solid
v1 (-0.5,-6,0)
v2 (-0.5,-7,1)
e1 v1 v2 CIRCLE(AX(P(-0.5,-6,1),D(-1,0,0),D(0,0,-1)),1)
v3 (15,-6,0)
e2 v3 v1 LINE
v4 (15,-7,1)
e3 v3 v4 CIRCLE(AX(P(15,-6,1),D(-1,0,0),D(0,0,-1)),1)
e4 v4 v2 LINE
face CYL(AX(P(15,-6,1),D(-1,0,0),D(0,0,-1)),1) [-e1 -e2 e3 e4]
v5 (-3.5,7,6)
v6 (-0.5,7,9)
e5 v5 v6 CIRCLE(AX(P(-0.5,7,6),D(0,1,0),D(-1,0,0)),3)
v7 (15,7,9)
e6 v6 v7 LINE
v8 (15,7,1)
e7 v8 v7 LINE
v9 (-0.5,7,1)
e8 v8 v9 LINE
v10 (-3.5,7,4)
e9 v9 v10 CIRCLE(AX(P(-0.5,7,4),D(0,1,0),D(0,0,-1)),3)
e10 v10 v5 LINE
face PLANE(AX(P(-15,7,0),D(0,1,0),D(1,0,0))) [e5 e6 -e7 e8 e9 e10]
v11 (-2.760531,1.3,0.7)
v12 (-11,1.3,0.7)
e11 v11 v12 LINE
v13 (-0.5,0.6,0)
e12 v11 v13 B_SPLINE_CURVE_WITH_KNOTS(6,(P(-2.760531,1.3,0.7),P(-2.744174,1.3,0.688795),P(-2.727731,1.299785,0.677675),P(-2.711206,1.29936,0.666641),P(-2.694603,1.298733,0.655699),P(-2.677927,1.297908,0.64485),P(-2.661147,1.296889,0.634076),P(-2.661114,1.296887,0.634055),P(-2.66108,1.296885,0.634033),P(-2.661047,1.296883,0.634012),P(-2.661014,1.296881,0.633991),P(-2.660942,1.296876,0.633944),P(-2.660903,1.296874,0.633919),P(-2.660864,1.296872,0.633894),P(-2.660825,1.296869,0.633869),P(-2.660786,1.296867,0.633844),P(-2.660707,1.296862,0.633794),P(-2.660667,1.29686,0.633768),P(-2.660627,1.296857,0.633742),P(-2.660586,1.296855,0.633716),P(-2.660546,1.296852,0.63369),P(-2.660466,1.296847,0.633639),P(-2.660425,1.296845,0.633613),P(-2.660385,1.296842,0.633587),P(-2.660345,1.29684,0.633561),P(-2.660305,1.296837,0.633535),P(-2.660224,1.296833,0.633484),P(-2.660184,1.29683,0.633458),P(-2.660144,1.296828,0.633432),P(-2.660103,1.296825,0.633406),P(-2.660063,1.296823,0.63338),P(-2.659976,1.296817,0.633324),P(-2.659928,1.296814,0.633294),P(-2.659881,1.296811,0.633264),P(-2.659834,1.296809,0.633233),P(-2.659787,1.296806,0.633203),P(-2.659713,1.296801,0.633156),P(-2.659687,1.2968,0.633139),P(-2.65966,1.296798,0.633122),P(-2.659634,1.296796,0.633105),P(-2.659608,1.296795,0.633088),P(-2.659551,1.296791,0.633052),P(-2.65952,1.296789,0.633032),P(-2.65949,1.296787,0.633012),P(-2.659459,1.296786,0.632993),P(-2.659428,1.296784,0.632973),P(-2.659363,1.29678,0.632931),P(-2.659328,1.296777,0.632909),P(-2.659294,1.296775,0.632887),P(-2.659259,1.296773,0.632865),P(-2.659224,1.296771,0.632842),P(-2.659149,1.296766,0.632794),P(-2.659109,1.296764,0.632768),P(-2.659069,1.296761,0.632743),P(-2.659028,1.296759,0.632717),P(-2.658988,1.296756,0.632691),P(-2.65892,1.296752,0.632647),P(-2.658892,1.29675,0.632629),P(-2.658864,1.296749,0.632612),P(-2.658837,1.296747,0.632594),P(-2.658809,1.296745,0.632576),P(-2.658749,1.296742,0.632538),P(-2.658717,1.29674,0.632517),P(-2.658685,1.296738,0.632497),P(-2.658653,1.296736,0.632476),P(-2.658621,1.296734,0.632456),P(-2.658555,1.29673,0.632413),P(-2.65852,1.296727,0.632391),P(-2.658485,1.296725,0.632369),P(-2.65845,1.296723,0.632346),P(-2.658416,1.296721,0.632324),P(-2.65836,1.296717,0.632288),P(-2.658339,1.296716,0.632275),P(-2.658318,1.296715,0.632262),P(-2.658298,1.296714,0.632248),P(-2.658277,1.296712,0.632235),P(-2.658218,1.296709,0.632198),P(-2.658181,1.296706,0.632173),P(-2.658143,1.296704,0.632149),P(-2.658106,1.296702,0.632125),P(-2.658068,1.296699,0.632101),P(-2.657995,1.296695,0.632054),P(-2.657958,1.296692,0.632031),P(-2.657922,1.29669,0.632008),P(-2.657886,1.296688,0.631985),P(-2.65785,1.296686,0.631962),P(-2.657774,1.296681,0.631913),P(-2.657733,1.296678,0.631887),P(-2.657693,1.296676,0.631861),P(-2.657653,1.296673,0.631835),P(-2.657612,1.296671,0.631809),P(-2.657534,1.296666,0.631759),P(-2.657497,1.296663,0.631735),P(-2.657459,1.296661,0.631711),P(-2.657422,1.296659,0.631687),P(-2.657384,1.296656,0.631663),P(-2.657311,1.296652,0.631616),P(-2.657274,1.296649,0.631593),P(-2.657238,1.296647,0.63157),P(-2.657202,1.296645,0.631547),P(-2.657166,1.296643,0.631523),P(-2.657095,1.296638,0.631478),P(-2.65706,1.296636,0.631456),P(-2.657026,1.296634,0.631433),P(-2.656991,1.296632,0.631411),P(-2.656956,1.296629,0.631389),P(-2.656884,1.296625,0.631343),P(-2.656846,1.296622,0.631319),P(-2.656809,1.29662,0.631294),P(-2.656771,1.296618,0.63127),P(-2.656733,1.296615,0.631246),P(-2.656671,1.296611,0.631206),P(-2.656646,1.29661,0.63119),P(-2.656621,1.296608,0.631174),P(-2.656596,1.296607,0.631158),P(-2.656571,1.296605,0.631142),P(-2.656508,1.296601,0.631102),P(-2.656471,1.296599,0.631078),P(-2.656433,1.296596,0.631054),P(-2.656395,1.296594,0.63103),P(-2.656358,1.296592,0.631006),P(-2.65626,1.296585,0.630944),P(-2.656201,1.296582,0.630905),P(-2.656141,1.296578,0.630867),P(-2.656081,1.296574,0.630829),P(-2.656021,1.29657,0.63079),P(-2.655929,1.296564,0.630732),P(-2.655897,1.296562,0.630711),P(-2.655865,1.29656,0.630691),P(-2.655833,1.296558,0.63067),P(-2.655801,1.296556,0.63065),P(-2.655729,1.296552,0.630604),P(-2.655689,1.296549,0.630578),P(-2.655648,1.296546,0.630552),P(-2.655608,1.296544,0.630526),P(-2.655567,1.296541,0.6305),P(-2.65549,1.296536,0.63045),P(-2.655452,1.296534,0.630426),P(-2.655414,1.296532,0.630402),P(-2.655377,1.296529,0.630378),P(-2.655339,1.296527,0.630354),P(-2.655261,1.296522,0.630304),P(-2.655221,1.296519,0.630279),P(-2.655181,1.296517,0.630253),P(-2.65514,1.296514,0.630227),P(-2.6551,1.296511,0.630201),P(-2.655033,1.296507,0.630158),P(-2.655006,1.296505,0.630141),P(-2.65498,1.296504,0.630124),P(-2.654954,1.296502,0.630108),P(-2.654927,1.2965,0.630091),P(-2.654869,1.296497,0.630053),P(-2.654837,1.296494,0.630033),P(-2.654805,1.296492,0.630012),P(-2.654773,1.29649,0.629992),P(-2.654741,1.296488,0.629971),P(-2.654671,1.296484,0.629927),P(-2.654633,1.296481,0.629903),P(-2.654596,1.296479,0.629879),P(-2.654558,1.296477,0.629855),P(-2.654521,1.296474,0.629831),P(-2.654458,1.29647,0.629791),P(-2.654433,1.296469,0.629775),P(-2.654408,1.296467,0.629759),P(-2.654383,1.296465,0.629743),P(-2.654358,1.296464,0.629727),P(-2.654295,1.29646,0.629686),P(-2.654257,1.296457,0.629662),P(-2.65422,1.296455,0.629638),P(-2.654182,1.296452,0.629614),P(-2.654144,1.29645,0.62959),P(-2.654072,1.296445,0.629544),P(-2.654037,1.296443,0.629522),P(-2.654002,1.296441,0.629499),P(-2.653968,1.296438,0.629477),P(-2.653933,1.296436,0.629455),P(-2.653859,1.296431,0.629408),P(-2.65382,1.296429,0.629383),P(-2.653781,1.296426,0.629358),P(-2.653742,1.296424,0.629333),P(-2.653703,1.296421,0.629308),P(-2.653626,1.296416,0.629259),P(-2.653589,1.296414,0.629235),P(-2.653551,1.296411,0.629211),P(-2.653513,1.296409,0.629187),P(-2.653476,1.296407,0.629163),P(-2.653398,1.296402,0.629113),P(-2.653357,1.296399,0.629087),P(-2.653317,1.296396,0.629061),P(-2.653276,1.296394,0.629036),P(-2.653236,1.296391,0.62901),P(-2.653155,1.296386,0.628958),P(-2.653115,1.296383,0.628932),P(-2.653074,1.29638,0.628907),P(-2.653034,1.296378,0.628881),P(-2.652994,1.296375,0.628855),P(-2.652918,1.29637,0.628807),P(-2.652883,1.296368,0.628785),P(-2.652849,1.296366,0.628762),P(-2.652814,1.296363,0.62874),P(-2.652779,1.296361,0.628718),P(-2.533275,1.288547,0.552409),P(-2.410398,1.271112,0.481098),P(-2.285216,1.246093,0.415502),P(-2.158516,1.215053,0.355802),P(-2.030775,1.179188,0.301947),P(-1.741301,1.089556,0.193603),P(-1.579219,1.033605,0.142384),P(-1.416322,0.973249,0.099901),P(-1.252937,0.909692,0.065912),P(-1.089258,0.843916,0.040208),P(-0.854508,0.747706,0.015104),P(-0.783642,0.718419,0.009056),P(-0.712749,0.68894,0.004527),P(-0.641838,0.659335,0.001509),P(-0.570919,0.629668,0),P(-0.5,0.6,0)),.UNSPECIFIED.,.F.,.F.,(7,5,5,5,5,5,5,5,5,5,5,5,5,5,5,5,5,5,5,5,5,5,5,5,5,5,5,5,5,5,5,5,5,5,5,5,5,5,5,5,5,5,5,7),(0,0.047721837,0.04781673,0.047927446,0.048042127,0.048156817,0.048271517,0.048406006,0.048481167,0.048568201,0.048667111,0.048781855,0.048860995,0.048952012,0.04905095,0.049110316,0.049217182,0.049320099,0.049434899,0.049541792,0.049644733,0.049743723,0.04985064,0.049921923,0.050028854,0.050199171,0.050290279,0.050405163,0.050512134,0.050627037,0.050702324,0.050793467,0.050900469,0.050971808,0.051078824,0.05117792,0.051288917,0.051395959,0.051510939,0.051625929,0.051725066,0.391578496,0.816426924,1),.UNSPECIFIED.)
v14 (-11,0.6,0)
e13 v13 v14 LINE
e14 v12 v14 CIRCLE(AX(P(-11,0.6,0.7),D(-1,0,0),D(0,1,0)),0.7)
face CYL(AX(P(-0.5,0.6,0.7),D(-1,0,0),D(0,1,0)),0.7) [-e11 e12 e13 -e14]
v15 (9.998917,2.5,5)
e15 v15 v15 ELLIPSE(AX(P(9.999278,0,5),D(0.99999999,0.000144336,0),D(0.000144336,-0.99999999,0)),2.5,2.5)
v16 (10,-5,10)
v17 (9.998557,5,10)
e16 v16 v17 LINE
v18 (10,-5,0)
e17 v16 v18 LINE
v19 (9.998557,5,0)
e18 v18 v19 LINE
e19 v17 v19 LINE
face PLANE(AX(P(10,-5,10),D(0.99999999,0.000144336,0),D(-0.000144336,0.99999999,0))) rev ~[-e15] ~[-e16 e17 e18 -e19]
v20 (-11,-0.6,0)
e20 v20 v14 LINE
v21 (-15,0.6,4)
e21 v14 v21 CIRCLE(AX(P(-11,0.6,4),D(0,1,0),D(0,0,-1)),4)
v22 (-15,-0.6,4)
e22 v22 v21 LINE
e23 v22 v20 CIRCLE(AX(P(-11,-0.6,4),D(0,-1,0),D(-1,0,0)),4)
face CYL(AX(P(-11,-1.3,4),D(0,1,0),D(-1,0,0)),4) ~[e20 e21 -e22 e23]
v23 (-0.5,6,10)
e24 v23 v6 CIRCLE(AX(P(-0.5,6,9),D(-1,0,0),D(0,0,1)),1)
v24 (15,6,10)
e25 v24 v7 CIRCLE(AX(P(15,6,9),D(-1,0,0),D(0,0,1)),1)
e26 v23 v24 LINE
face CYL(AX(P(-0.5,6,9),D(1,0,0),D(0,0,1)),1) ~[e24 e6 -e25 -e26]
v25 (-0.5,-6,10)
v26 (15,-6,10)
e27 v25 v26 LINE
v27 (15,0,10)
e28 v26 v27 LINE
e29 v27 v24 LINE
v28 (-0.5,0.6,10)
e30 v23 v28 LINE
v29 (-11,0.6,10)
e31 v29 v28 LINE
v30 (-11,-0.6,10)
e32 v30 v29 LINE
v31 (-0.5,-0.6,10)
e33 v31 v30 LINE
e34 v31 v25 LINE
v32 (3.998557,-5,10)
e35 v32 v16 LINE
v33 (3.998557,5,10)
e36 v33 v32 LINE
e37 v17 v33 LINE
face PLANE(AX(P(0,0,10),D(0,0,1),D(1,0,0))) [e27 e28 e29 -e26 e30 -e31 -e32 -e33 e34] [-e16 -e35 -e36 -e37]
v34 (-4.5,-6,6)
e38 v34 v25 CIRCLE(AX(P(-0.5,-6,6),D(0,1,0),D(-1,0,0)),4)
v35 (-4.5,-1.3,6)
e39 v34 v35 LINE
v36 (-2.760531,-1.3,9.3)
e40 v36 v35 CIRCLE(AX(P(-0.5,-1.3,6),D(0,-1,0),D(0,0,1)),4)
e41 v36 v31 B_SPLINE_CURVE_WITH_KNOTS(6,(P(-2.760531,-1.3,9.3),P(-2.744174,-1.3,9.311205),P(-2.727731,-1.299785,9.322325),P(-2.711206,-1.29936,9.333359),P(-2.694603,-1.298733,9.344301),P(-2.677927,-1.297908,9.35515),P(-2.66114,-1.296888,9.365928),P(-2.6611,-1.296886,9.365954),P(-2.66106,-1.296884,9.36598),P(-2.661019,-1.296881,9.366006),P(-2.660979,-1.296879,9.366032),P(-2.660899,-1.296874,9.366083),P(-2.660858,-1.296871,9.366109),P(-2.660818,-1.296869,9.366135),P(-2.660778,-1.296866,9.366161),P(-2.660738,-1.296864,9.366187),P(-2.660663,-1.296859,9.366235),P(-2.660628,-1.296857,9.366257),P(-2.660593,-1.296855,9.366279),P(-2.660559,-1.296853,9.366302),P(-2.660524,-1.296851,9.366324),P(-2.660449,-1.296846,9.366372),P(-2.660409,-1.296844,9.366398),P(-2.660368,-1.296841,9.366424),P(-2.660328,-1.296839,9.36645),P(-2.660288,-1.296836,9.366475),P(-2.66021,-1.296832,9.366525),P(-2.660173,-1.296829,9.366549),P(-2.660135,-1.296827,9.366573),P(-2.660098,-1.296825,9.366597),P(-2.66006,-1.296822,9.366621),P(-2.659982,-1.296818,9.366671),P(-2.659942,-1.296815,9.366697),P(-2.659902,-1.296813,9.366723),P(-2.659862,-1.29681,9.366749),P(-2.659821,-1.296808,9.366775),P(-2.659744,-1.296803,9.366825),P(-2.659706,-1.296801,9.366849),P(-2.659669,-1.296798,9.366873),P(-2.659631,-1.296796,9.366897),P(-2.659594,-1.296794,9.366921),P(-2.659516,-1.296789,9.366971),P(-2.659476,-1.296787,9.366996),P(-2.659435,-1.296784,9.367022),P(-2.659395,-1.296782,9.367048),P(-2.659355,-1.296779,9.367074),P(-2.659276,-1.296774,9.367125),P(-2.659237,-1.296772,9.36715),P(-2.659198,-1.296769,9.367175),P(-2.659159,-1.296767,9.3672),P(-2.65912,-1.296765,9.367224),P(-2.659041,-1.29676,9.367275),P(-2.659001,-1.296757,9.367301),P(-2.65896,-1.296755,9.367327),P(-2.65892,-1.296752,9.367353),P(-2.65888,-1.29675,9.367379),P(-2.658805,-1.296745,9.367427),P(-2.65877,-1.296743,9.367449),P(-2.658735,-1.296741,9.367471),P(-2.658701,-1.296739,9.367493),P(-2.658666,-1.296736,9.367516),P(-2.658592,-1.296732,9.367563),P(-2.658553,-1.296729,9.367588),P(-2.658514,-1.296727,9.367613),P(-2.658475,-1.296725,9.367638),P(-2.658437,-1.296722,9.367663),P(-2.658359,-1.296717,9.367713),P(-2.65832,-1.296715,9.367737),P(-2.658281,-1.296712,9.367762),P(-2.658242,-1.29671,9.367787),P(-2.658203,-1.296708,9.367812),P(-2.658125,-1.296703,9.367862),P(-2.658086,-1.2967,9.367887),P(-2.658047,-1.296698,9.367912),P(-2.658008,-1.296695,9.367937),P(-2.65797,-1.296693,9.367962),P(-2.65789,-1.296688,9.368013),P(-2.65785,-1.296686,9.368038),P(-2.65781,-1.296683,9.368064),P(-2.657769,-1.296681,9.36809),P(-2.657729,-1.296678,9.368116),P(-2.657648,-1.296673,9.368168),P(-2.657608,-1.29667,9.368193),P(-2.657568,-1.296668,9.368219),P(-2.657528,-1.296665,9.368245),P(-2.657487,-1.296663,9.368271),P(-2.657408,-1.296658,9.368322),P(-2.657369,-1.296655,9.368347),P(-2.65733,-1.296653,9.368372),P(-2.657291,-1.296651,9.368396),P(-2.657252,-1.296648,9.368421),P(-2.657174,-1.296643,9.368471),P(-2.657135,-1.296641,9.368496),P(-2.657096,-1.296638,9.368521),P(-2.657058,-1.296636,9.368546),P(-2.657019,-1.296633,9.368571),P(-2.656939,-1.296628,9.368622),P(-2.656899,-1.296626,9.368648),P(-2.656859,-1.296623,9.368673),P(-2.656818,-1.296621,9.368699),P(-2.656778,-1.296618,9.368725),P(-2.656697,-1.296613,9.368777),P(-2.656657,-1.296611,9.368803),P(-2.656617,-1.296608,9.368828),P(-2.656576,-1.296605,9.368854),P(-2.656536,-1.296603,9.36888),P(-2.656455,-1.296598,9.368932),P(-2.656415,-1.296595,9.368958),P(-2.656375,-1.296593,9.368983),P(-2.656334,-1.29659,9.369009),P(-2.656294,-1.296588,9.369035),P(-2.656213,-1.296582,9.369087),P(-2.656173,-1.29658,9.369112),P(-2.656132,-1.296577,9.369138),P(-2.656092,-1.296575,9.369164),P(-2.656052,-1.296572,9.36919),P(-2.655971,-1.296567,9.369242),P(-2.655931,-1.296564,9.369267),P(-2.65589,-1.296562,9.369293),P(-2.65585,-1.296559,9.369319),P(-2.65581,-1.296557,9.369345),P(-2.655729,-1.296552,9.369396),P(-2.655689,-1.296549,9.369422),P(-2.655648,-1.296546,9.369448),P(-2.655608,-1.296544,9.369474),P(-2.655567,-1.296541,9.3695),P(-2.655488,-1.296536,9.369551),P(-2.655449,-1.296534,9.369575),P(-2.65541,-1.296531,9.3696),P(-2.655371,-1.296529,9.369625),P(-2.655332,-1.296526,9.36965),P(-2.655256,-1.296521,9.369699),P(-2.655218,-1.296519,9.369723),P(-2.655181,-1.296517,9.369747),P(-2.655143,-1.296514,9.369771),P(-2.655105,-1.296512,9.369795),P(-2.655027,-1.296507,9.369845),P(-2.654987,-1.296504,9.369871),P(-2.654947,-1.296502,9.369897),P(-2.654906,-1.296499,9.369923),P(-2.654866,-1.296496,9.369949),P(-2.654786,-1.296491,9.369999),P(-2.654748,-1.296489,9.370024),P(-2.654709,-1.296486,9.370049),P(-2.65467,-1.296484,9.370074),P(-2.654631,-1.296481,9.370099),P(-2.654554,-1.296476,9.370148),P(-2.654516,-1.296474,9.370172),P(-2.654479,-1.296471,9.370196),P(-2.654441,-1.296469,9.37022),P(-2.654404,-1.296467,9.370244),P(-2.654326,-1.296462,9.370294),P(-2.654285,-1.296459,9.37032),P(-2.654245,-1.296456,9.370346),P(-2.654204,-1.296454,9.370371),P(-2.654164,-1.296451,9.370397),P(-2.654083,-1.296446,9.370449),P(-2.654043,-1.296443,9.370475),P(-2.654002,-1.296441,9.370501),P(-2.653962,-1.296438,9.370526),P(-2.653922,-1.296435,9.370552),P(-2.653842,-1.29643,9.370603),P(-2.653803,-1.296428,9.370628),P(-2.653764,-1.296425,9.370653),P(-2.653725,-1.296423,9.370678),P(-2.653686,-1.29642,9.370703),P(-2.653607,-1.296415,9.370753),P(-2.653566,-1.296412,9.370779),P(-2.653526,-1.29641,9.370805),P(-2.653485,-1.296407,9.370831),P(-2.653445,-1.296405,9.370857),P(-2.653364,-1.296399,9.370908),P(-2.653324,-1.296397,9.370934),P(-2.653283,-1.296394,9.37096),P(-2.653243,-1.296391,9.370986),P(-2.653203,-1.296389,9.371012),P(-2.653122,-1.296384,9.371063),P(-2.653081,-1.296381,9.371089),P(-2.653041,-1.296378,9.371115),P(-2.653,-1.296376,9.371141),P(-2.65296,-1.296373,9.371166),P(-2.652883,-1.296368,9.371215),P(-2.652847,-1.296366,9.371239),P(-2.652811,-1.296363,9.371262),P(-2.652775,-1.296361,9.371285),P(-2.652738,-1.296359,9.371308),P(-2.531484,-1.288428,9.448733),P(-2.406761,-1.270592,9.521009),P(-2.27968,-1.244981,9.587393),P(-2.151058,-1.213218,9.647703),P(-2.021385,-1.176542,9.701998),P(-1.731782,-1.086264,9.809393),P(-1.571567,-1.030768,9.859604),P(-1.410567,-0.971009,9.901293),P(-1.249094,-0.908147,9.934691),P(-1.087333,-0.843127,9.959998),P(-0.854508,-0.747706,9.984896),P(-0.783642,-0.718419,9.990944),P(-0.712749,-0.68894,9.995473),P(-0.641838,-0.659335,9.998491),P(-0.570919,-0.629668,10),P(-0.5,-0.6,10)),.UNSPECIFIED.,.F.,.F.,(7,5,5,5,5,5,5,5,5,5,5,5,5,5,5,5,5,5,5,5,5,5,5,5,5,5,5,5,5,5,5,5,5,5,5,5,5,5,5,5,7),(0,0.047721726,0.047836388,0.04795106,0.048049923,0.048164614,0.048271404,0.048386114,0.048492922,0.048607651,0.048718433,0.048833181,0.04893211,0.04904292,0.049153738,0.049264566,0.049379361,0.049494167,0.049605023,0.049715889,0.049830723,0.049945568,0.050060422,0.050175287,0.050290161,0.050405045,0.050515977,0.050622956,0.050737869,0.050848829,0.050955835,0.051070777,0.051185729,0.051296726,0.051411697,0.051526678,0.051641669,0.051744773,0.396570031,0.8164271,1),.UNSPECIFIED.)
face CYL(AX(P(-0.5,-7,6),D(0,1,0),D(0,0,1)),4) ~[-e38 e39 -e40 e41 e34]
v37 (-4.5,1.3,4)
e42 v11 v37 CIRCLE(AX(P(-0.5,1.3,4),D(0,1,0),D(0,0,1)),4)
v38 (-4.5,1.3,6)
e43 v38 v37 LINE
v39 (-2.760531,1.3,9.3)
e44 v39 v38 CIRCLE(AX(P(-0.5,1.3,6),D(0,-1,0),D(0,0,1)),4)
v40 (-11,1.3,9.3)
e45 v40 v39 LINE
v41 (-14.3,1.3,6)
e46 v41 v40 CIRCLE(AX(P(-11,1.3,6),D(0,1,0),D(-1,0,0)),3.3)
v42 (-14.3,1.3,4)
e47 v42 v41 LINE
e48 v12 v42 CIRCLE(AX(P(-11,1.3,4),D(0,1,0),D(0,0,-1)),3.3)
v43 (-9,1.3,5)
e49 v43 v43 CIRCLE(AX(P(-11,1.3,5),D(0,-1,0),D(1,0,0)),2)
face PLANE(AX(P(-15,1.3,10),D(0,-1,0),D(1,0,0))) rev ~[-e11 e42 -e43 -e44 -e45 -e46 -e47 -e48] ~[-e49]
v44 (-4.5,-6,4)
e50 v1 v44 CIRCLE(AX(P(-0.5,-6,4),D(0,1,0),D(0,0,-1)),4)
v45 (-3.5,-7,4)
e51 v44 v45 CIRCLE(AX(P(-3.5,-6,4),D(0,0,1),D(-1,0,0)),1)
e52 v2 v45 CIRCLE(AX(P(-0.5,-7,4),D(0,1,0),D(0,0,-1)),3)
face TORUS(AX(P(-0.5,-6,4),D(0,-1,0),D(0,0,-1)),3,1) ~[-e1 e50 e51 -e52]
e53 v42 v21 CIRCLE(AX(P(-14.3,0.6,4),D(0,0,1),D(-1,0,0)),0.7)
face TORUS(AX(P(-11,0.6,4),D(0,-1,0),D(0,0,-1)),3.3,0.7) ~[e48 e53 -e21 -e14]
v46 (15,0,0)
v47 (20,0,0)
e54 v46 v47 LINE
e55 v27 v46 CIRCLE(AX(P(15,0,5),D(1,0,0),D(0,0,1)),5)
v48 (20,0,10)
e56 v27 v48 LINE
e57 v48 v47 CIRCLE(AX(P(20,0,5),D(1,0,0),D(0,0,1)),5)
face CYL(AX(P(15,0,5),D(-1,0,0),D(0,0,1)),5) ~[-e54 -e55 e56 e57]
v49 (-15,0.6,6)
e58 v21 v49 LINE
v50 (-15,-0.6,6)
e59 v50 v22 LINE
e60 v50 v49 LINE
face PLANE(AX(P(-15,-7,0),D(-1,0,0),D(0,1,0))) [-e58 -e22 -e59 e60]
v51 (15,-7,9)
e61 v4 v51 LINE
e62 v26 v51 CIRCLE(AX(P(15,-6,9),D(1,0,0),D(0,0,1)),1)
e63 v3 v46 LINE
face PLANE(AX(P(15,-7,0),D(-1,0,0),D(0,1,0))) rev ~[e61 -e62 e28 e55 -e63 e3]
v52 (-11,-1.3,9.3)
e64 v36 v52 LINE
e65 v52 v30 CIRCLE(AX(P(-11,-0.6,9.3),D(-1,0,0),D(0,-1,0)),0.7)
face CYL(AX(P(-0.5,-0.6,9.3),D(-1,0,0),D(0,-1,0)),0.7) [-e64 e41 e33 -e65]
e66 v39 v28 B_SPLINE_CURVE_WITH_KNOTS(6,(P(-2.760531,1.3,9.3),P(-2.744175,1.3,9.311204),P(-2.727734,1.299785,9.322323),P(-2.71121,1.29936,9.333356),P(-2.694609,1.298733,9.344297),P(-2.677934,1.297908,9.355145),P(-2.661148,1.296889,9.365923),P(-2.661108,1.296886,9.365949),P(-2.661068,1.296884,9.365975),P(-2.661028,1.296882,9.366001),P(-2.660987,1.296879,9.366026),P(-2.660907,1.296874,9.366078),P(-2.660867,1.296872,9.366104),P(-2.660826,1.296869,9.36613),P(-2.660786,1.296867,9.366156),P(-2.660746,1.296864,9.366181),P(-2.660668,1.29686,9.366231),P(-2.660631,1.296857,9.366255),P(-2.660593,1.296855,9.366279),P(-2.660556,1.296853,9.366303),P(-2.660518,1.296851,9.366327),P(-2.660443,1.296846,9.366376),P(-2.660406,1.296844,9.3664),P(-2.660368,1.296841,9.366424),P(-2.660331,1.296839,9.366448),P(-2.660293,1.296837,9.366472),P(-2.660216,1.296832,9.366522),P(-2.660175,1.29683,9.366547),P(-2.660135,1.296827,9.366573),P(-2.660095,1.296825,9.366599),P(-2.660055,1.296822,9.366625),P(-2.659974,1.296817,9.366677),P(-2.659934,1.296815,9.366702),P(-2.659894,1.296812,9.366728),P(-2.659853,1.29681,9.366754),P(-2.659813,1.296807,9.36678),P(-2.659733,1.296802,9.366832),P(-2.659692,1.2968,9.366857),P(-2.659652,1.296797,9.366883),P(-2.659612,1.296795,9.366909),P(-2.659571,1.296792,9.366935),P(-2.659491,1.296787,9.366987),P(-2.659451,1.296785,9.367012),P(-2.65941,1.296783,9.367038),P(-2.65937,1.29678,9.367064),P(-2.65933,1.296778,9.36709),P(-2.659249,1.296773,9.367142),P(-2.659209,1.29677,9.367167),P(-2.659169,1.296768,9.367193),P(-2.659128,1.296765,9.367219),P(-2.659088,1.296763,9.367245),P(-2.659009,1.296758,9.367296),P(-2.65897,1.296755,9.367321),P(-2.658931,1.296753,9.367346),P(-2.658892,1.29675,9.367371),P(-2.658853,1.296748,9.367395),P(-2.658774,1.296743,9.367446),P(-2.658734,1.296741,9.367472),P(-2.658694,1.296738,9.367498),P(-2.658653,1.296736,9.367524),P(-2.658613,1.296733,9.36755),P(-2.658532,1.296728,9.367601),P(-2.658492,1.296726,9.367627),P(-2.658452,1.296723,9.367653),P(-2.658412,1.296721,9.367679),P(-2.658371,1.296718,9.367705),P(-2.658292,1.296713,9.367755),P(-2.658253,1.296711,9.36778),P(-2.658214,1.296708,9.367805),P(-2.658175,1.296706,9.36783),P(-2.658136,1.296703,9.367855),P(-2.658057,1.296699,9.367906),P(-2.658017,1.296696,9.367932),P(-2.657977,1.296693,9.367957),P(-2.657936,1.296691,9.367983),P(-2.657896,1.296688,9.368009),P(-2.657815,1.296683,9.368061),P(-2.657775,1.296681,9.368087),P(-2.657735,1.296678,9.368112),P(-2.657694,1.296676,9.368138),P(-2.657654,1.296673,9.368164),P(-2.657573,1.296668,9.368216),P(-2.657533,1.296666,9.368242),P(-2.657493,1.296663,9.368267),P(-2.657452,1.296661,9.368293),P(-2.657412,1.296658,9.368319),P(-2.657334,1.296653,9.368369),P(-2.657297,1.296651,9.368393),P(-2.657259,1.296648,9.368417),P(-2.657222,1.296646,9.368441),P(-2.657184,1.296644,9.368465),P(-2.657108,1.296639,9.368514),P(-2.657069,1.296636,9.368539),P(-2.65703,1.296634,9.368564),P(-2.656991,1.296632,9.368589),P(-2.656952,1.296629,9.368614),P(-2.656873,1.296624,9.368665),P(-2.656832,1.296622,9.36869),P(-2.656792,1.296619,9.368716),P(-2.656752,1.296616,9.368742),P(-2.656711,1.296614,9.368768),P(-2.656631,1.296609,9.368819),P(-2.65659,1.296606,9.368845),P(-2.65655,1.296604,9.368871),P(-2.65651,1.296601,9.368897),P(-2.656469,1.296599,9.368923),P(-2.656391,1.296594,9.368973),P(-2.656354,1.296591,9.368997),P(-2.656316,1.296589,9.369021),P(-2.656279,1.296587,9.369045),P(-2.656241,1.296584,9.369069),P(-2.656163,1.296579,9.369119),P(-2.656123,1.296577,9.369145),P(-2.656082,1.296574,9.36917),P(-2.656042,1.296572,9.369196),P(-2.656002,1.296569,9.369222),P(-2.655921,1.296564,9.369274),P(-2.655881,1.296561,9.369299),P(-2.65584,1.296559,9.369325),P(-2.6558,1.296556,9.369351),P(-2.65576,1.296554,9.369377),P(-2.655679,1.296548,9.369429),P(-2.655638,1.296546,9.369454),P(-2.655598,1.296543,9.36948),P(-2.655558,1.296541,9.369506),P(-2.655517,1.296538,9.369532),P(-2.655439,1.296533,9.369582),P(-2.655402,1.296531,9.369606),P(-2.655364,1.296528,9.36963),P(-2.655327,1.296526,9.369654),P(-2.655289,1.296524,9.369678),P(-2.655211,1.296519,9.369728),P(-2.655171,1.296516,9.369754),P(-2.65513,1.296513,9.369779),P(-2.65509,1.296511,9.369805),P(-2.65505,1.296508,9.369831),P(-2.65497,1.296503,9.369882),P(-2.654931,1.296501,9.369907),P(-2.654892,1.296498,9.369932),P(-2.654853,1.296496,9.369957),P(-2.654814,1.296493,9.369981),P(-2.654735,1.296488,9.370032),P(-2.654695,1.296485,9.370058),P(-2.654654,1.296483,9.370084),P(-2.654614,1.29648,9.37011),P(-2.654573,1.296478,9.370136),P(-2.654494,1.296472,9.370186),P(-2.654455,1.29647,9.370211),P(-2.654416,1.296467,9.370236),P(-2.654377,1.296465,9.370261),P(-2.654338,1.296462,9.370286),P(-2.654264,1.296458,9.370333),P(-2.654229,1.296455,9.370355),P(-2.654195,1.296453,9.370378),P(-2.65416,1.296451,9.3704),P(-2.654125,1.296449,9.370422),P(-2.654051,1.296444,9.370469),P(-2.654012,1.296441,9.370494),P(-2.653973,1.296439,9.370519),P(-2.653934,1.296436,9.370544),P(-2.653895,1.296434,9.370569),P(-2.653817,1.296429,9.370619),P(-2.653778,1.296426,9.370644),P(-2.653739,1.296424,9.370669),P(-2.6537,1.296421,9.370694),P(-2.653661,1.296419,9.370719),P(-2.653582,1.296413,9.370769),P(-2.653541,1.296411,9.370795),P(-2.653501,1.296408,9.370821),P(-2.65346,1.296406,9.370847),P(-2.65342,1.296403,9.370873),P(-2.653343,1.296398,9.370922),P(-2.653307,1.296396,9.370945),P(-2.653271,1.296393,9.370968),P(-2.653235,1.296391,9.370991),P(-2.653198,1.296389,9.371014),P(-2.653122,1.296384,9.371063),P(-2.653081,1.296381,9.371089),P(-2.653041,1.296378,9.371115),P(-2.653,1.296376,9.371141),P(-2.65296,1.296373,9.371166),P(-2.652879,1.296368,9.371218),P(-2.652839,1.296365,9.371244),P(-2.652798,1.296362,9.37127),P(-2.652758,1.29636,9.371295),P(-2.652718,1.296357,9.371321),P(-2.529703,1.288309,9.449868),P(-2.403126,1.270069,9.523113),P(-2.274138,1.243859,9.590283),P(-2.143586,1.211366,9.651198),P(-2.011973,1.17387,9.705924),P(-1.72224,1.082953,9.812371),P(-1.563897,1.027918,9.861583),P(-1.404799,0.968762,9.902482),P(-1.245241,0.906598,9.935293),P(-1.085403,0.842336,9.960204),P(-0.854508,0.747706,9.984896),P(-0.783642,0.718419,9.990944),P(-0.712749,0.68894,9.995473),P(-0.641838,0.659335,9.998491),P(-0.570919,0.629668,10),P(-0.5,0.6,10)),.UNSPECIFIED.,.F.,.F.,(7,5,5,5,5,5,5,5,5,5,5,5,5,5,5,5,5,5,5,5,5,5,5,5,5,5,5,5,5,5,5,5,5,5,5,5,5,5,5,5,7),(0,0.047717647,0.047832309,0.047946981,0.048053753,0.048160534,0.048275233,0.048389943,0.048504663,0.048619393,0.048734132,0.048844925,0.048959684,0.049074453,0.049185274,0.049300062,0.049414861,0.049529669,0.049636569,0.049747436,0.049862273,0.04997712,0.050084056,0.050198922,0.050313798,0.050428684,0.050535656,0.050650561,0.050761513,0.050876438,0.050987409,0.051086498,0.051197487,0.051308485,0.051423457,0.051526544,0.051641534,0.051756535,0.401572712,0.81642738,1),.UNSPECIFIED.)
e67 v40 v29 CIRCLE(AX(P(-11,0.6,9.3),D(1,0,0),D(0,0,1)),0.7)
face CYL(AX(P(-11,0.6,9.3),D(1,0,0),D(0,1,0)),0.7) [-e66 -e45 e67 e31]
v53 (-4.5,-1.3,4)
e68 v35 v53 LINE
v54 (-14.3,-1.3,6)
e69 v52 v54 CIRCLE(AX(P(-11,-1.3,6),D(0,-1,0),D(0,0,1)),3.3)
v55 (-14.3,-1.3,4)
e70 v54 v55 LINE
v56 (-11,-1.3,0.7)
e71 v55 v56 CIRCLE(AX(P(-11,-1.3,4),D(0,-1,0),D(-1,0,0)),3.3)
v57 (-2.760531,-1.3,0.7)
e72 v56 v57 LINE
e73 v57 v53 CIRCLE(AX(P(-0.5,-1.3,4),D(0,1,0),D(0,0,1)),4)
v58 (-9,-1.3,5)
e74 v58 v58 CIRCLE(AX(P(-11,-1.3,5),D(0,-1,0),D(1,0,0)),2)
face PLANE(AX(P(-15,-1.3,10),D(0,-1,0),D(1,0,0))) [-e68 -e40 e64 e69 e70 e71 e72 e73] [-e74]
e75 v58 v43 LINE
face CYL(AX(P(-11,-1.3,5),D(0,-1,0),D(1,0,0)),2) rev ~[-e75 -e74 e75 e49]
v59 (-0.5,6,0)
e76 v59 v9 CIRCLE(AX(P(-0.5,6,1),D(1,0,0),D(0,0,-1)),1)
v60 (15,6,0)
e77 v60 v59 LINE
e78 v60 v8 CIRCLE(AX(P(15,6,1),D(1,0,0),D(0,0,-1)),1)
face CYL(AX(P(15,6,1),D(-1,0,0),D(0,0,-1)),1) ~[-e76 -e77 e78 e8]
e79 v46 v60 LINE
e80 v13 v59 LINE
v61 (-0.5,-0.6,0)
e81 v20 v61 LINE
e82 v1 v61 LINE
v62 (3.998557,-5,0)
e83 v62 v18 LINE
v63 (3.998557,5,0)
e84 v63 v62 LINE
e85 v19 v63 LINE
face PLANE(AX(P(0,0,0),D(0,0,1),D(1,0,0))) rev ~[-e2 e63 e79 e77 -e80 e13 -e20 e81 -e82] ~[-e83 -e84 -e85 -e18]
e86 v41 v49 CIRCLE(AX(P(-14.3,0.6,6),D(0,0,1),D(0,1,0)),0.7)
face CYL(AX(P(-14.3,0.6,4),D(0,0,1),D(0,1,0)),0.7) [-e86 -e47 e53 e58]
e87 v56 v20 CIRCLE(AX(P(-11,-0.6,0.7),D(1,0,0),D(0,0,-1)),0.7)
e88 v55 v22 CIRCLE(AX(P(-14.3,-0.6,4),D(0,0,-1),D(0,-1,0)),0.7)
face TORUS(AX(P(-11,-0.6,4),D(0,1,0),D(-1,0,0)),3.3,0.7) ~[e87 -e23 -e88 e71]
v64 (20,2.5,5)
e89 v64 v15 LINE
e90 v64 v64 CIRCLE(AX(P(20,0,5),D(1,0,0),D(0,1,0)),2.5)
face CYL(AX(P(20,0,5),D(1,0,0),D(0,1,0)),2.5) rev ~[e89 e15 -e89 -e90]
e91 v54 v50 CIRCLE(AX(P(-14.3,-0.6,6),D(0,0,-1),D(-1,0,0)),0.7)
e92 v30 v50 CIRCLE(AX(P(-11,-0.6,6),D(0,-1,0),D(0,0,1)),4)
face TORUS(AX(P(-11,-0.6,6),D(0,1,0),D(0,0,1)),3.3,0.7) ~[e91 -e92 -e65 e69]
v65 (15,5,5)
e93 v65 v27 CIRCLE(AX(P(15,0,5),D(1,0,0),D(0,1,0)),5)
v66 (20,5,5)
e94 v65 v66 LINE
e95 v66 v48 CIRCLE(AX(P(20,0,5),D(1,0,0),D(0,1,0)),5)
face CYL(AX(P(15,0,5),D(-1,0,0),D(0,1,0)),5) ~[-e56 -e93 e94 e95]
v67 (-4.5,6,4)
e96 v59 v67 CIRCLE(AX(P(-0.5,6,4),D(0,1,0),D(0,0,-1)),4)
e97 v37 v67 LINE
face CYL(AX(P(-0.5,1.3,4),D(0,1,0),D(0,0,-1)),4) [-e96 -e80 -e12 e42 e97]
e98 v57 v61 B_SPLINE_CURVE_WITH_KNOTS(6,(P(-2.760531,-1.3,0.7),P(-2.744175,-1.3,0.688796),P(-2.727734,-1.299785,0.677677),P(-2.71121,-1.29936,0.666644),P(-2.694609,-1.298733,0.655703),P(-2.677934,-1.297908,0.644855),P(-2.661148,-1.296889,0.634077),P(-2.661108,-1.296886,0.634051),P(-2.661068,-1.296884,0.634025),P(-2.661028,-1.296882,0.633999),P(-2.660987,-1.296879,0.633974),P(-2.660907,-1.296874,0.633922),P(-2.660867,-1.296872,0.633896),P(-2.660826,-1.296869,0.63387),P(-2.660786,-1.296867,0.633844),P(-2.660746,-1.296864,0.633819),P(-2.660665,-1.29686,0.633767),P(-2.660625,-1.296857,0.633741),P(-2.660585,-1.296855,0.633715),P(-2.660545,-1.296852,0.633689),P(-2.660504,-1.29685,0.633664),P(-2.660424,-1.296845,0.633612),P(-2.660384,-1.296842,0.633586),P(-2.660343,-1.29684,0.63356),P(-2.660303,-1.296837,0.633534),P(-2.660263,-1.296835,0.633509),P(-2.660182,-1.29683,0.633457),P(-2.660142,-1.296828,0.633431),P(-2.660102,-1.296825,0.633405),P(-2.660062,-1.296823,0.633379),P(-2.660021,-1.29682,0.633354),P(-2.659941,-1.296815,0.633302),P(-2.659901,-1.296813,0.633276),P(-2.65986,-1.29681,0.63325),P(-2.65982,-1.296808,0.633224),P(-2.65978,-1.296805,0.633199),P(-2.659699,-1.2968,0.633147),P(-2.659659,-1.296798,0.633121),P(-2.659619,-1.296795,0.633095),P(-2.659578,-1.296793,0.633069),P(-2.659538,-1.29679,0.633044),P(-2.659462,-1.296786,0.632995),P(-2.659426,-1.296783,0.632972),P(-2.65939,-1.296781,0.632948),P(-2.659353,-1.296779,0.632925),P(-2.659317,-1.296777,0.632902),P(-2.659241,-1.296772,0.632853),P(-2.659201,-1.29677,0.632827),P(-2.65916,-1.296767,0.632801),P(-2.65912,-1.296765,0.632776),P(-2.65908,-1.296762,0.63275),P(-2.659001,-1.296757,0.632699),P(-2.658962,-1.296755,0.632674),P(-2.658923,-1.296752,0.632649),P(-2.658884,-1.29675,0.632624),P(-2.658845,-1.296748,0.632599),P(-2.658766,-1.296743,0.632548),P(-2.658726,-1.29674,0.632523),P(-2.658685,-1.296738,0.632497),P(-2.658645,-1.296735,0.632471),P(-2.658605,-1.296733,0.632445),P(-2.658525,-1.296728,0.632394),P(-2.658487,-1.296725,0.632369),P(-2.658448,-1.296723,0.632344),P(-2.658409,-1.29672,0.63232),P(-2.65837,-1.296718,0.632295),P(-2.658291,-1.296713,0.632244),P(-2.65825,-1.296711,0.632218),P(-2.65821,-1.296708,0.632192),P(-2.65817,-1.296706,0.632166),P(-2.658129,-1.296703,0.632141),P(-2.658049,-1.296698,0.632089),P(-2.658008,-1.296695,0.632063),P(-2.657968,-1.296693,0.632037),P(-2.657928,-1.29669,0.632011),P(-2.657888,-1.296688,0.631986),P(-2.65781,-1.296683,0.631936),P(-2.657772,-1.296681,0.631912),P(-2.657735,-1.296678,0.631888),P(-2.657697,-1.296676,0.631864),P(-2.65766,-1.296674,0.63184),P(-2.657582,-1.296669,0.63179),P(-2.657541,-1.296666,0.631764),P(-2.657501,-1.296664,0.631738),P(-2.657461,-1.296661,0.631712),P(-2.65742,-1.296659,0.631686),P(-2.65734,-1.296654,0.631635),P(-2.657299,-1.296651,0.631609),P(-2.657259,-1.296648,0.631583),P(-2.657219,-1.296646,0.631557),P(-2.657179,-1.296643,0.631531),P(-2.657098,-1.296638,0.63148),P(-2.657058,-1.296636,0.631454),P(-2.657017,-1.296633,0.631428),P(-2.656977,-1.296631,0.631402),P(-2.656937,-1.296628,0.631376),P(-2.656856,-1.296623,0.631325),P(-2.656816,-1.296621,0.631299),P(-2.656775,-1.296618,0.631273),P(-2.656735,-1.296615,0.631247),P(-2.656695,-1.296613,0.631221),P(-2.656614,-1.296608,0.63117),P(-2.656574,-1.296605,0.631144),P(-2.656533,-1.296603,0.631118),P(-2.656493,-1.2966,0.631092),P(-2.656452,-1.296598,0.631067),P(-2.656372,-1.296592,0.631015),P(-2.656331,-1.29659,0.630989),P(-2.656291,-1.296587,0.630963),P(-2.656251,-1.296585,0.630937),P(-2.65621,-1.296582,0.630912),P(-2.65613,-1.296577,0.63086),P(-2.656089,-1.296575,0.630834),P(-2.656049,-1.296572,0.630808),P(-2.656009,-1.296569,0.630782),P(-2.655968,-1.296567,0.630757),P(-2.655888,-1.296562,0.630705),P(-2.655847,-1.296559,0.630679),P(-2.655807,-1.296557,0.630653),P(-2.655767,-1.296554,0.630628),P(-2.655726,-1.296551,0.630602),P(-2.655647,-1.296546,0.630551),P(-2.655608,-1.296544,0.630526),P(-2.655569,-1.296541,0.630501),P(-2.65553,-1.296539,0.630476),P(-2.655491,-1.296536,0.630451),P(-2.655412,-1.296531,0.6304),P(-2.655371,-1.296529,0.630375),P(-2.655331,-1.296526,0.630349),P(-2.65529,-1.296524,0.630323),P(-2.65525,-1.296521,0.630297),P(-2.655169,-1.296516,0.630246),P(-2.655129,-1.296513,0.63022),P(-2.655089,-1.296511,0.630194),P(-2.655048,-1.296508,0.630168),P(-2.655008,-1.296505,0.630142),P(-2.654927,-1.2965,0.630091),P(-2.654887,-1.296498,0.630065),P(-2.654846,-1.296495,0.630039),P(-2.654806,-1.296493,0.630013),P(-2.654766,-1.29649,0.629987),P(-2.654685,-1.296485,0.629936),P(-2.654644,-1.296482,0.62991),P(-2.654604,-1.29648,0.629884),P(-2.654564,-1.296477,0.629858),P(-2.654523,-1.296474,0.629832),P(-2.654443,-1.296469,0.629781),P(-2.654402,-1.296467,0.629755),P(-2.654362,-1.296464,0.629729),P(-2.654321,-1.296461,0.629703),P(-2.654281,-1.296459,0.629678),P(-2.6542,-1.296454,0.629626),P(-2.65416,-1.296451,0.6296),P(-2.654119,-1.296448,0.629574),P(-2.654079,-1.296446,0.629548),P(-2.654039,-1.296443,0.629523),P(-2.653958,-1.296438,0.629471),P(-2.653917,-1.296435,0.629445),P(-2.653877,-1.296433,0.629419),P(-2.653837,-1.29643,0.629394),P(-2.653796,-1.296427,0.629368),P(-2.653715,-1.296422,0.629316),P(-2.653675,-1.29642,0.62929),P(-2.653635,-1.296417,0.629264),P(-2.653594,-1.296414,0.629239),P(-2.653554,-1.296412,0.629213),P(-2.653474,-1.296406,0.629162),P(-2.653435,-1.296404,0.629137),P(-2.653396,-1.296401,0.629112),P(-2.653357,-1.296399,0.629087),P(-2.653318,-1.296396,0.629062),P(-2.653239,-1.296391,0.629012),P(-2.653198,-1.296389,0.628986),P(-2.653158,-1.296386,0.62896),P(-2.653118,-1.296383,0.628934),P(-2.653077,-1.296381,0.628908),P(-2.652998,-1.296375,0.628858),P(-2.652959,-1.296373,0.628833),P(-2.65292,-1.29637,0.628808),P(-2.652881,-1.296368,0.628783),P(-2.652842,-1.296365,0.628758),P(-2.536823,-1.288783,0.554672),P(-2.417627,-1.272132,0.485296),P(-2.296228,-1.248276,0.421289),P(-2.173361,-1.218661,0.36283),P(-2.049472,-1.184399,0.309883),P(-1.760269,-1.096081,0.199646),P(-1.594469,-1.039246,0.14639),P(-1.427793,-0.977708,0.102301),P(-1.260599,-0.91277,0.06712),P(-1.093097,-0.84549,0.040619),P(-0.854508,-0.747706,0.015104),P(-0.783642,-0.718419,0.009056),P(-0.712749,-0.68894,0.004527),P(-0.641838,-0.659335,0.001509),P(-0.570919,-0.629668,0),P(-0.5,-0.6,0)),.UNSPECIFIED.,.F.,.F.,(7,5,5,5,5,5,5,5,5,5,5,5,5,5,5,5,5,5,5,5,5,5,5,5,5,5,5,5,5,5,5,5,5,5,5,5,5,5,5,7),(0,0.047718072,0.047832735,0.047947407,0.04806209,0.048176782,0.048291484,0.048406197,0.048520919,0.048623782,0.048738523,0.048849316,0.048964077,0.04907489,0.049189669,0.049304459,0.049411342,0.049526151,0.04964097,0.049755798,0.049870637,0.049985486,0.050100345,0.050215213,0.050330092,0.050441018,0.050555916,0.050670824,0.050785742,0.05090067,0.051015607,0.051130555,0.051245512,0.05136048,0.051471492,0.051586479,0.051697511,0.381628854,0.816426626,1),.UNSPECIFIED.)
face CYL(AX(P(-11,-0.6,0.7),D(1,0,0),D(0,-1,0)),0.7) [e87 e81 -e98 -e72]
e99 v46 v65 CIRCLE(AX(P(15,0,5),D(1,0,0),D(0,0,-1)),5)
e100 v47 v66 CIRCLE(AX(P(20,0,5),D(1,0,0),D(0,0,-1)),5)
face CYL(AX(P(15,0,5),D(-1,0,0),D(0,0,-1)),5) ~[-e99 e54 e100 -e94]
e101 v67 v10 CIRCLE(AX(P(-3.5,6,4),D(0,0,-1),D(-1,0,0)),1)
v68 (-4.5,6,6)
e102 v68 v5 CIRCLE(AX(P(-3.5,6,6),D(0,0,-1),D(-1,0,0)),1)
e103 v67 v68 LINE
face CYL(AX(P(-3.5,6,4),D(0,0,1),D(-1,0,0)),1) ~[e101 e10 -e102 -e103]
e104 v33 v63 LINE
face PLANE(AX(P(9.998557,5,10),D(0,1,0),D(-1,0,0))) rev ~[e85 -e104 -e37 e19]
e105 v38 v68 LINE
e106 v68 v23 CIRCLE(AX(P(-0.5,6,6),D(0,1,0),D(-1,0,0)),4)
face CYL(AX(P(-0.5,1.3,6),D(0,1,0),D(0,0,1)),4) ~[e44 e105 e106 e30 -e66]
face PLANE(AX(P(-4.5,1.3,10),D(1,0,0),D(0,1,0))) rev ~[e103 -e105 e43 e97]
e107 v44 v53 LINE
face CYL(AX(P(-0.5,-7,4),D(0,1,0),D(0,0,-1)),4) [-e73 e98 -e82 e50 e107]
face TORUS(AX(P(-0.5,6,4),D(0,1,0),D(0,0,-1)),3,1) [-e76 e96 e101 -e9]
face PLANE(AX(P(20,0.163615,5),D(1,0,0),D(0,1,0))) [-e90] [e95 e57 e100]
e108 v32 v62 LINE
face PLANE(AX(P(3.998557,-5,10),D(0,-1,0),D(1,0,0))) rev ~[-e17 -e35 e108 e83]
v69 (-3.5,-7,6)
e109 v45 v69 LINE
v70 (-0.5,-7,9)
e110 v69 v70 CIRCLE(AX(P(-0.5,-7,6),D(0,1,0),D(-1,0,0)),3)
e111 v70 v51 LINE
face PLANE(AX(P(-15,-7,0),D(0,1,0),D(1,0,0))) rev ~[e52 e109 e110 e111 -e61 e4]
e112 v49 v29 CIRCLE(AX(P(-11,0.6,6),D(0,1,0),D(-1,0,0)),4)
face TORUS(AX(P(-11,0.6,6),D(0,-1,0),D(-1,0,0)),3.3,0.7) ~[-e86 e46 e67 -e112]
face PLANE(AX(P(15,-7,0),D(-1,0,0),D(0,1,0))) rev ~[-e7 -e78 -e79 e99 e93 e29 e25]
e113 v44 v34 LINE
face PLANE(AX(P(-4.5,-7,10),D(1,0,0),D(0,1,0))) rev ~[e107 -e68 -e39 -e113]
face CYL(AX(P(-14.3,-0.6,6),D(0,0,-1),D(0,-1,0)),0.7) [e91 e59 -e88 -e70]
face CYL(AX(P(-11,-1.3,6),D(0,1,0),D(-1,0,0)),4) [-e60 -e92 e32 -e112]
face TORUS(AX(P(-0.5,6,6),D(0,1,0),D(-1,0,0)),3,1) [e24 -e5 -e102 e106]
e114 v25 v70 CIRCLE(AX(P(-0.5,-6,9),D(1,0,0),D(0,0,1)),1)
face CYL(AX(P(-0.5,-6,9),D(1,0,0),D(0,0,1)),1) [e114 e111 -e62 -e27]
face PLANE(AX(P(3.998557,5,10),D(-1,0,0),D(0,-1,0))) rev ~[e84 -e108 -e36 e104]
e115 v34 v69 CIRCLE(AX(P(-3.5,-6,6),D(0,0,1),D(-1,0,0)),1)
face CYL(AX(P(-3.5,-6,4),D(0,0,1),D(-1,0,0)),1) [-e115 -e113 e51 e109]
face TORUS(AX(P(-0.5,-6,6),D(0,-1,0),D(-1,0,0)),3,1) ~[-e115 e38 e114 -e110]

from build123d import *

# Parameters (mm, degrees)
F0_W      = 30
F0_H      = 14
F1_DEPTH  = 10
F2_W      = 10.5
F2_H      = 5.7
F3_DEPTH  = 25
F4_R      = 4
F5_R      = 2
F6_DEPTH  = 25
F8_DEPTH  = 5
F10_DEPTH = 12
F11_R     = 0.7
F12_R     = 1
F13_R     = 2.5
F14_DEPTH = 15


with BuildPart() as f1:
    # F0 (on Top) → F1 (new body)
    with BuildSketch(Plane.XY):
        Rectangle(F0_W, F0_H)
    extrude(amount=F1_DEPTH)

    # F2 (on face) → F3 (cut)
    with BuildSketch(Plane.XY.offset(10)):
        with Locations((-9.75, -4.15)):
            Rectangle(F2_W, F2_H)
        with Locations((-9.75, 4.15)):
            Rectangle(F2_W, F2_H)
    extrude(amount=-F3_DEPTH, mode=Mode.SUBTRACT)

    # F4
    f4_edges = [f1.edges().sort_by_distance(p)[0] for p in [
        (-15, 0, 10),
        (-15, 0, 0),
        (-4.5, -4.15, 10),
        (-4.5, -4.15, 0),
        (-4.5, 4.15, 0),
        (-4.5, 4.15, 10),
    ]]
    fillet(f4_edges, radius=F4_R)

    # F5 (on face) → F6 (cut)
    with BuildSketch(Plane.XZ.offset(1.3)):
        with Locations((-11, 5)):
            Circle(F5_R)
    extrude(amount=-F6_DEPTH, mode=Mode.SUBTRACT)

    # F7 (on face) → F8 (join)
    with BuildSketch(Plane.YZ.offset(15)):
        with BuildLine():
            ThreePointArc((0, 0), (3.5355339059, 1.4644660941), (5, 5))
            ThreePointArc((5, 5), (3.5355339059, 8.5355339059), (0, 10))
            ThreePointArc((0, 10), (-5, 5), (0, 0))
        make_face()
    extrude(amount=F8_DEPTH)

    # F9 (on face) → F10 (cut)
    with BuildSketch(Plane.XY.offset(10)):
        Polygon((10, -5), (9.9985566437, 5), (3.9985566437, 5), (3.9985566437, -5), align=None)
    extrude(amount=-F10_DEPTH, mode=Mode.SUBTRACT)

    # F11
    f11_edges = [f1.edges().sort_by_distance(p)[0] for p in [
        (-5.75, -1.3, 10),
        (-5.75, -1.3, 0),
        (-13.828427, -1.3, 1.171573),
        (-15, -1.3, 5),
        (-13.828427, -1.3, 8.828427),
        (-5.75, 1.3, 0),
        (-13.828427, 1.3, 1.171573),
        (-15, 1.3, 5),
        (-13.828427, 1.3, 8.828427),
        (-5.75, 1.3, 10),
    ]]
    fillet(f11_edges, radius=F11_R)

    # F12
    f12_edges = [f1.edges().sort_by_distance(p)[0] for p in [
        (7.25, -7, 10),
        (-3.328427, -7, 1.171573),
        (-4.5, -7, 5),
        (-3.328427, -7, 8.828427),
        (7.25, 7, 10),
    ]]
    fillet(f12_edges, radius=F12_R)

    # F13 (on face) → F14 (cut)
    with BuildSketch(Plane.YZ.offset(20)):
        with Locations((0, 5)):
            Circle(F13_R)
    extrude(amount=-F14_DEPTH, mode=Mode.SUBTRACT)


solid = f1.part
